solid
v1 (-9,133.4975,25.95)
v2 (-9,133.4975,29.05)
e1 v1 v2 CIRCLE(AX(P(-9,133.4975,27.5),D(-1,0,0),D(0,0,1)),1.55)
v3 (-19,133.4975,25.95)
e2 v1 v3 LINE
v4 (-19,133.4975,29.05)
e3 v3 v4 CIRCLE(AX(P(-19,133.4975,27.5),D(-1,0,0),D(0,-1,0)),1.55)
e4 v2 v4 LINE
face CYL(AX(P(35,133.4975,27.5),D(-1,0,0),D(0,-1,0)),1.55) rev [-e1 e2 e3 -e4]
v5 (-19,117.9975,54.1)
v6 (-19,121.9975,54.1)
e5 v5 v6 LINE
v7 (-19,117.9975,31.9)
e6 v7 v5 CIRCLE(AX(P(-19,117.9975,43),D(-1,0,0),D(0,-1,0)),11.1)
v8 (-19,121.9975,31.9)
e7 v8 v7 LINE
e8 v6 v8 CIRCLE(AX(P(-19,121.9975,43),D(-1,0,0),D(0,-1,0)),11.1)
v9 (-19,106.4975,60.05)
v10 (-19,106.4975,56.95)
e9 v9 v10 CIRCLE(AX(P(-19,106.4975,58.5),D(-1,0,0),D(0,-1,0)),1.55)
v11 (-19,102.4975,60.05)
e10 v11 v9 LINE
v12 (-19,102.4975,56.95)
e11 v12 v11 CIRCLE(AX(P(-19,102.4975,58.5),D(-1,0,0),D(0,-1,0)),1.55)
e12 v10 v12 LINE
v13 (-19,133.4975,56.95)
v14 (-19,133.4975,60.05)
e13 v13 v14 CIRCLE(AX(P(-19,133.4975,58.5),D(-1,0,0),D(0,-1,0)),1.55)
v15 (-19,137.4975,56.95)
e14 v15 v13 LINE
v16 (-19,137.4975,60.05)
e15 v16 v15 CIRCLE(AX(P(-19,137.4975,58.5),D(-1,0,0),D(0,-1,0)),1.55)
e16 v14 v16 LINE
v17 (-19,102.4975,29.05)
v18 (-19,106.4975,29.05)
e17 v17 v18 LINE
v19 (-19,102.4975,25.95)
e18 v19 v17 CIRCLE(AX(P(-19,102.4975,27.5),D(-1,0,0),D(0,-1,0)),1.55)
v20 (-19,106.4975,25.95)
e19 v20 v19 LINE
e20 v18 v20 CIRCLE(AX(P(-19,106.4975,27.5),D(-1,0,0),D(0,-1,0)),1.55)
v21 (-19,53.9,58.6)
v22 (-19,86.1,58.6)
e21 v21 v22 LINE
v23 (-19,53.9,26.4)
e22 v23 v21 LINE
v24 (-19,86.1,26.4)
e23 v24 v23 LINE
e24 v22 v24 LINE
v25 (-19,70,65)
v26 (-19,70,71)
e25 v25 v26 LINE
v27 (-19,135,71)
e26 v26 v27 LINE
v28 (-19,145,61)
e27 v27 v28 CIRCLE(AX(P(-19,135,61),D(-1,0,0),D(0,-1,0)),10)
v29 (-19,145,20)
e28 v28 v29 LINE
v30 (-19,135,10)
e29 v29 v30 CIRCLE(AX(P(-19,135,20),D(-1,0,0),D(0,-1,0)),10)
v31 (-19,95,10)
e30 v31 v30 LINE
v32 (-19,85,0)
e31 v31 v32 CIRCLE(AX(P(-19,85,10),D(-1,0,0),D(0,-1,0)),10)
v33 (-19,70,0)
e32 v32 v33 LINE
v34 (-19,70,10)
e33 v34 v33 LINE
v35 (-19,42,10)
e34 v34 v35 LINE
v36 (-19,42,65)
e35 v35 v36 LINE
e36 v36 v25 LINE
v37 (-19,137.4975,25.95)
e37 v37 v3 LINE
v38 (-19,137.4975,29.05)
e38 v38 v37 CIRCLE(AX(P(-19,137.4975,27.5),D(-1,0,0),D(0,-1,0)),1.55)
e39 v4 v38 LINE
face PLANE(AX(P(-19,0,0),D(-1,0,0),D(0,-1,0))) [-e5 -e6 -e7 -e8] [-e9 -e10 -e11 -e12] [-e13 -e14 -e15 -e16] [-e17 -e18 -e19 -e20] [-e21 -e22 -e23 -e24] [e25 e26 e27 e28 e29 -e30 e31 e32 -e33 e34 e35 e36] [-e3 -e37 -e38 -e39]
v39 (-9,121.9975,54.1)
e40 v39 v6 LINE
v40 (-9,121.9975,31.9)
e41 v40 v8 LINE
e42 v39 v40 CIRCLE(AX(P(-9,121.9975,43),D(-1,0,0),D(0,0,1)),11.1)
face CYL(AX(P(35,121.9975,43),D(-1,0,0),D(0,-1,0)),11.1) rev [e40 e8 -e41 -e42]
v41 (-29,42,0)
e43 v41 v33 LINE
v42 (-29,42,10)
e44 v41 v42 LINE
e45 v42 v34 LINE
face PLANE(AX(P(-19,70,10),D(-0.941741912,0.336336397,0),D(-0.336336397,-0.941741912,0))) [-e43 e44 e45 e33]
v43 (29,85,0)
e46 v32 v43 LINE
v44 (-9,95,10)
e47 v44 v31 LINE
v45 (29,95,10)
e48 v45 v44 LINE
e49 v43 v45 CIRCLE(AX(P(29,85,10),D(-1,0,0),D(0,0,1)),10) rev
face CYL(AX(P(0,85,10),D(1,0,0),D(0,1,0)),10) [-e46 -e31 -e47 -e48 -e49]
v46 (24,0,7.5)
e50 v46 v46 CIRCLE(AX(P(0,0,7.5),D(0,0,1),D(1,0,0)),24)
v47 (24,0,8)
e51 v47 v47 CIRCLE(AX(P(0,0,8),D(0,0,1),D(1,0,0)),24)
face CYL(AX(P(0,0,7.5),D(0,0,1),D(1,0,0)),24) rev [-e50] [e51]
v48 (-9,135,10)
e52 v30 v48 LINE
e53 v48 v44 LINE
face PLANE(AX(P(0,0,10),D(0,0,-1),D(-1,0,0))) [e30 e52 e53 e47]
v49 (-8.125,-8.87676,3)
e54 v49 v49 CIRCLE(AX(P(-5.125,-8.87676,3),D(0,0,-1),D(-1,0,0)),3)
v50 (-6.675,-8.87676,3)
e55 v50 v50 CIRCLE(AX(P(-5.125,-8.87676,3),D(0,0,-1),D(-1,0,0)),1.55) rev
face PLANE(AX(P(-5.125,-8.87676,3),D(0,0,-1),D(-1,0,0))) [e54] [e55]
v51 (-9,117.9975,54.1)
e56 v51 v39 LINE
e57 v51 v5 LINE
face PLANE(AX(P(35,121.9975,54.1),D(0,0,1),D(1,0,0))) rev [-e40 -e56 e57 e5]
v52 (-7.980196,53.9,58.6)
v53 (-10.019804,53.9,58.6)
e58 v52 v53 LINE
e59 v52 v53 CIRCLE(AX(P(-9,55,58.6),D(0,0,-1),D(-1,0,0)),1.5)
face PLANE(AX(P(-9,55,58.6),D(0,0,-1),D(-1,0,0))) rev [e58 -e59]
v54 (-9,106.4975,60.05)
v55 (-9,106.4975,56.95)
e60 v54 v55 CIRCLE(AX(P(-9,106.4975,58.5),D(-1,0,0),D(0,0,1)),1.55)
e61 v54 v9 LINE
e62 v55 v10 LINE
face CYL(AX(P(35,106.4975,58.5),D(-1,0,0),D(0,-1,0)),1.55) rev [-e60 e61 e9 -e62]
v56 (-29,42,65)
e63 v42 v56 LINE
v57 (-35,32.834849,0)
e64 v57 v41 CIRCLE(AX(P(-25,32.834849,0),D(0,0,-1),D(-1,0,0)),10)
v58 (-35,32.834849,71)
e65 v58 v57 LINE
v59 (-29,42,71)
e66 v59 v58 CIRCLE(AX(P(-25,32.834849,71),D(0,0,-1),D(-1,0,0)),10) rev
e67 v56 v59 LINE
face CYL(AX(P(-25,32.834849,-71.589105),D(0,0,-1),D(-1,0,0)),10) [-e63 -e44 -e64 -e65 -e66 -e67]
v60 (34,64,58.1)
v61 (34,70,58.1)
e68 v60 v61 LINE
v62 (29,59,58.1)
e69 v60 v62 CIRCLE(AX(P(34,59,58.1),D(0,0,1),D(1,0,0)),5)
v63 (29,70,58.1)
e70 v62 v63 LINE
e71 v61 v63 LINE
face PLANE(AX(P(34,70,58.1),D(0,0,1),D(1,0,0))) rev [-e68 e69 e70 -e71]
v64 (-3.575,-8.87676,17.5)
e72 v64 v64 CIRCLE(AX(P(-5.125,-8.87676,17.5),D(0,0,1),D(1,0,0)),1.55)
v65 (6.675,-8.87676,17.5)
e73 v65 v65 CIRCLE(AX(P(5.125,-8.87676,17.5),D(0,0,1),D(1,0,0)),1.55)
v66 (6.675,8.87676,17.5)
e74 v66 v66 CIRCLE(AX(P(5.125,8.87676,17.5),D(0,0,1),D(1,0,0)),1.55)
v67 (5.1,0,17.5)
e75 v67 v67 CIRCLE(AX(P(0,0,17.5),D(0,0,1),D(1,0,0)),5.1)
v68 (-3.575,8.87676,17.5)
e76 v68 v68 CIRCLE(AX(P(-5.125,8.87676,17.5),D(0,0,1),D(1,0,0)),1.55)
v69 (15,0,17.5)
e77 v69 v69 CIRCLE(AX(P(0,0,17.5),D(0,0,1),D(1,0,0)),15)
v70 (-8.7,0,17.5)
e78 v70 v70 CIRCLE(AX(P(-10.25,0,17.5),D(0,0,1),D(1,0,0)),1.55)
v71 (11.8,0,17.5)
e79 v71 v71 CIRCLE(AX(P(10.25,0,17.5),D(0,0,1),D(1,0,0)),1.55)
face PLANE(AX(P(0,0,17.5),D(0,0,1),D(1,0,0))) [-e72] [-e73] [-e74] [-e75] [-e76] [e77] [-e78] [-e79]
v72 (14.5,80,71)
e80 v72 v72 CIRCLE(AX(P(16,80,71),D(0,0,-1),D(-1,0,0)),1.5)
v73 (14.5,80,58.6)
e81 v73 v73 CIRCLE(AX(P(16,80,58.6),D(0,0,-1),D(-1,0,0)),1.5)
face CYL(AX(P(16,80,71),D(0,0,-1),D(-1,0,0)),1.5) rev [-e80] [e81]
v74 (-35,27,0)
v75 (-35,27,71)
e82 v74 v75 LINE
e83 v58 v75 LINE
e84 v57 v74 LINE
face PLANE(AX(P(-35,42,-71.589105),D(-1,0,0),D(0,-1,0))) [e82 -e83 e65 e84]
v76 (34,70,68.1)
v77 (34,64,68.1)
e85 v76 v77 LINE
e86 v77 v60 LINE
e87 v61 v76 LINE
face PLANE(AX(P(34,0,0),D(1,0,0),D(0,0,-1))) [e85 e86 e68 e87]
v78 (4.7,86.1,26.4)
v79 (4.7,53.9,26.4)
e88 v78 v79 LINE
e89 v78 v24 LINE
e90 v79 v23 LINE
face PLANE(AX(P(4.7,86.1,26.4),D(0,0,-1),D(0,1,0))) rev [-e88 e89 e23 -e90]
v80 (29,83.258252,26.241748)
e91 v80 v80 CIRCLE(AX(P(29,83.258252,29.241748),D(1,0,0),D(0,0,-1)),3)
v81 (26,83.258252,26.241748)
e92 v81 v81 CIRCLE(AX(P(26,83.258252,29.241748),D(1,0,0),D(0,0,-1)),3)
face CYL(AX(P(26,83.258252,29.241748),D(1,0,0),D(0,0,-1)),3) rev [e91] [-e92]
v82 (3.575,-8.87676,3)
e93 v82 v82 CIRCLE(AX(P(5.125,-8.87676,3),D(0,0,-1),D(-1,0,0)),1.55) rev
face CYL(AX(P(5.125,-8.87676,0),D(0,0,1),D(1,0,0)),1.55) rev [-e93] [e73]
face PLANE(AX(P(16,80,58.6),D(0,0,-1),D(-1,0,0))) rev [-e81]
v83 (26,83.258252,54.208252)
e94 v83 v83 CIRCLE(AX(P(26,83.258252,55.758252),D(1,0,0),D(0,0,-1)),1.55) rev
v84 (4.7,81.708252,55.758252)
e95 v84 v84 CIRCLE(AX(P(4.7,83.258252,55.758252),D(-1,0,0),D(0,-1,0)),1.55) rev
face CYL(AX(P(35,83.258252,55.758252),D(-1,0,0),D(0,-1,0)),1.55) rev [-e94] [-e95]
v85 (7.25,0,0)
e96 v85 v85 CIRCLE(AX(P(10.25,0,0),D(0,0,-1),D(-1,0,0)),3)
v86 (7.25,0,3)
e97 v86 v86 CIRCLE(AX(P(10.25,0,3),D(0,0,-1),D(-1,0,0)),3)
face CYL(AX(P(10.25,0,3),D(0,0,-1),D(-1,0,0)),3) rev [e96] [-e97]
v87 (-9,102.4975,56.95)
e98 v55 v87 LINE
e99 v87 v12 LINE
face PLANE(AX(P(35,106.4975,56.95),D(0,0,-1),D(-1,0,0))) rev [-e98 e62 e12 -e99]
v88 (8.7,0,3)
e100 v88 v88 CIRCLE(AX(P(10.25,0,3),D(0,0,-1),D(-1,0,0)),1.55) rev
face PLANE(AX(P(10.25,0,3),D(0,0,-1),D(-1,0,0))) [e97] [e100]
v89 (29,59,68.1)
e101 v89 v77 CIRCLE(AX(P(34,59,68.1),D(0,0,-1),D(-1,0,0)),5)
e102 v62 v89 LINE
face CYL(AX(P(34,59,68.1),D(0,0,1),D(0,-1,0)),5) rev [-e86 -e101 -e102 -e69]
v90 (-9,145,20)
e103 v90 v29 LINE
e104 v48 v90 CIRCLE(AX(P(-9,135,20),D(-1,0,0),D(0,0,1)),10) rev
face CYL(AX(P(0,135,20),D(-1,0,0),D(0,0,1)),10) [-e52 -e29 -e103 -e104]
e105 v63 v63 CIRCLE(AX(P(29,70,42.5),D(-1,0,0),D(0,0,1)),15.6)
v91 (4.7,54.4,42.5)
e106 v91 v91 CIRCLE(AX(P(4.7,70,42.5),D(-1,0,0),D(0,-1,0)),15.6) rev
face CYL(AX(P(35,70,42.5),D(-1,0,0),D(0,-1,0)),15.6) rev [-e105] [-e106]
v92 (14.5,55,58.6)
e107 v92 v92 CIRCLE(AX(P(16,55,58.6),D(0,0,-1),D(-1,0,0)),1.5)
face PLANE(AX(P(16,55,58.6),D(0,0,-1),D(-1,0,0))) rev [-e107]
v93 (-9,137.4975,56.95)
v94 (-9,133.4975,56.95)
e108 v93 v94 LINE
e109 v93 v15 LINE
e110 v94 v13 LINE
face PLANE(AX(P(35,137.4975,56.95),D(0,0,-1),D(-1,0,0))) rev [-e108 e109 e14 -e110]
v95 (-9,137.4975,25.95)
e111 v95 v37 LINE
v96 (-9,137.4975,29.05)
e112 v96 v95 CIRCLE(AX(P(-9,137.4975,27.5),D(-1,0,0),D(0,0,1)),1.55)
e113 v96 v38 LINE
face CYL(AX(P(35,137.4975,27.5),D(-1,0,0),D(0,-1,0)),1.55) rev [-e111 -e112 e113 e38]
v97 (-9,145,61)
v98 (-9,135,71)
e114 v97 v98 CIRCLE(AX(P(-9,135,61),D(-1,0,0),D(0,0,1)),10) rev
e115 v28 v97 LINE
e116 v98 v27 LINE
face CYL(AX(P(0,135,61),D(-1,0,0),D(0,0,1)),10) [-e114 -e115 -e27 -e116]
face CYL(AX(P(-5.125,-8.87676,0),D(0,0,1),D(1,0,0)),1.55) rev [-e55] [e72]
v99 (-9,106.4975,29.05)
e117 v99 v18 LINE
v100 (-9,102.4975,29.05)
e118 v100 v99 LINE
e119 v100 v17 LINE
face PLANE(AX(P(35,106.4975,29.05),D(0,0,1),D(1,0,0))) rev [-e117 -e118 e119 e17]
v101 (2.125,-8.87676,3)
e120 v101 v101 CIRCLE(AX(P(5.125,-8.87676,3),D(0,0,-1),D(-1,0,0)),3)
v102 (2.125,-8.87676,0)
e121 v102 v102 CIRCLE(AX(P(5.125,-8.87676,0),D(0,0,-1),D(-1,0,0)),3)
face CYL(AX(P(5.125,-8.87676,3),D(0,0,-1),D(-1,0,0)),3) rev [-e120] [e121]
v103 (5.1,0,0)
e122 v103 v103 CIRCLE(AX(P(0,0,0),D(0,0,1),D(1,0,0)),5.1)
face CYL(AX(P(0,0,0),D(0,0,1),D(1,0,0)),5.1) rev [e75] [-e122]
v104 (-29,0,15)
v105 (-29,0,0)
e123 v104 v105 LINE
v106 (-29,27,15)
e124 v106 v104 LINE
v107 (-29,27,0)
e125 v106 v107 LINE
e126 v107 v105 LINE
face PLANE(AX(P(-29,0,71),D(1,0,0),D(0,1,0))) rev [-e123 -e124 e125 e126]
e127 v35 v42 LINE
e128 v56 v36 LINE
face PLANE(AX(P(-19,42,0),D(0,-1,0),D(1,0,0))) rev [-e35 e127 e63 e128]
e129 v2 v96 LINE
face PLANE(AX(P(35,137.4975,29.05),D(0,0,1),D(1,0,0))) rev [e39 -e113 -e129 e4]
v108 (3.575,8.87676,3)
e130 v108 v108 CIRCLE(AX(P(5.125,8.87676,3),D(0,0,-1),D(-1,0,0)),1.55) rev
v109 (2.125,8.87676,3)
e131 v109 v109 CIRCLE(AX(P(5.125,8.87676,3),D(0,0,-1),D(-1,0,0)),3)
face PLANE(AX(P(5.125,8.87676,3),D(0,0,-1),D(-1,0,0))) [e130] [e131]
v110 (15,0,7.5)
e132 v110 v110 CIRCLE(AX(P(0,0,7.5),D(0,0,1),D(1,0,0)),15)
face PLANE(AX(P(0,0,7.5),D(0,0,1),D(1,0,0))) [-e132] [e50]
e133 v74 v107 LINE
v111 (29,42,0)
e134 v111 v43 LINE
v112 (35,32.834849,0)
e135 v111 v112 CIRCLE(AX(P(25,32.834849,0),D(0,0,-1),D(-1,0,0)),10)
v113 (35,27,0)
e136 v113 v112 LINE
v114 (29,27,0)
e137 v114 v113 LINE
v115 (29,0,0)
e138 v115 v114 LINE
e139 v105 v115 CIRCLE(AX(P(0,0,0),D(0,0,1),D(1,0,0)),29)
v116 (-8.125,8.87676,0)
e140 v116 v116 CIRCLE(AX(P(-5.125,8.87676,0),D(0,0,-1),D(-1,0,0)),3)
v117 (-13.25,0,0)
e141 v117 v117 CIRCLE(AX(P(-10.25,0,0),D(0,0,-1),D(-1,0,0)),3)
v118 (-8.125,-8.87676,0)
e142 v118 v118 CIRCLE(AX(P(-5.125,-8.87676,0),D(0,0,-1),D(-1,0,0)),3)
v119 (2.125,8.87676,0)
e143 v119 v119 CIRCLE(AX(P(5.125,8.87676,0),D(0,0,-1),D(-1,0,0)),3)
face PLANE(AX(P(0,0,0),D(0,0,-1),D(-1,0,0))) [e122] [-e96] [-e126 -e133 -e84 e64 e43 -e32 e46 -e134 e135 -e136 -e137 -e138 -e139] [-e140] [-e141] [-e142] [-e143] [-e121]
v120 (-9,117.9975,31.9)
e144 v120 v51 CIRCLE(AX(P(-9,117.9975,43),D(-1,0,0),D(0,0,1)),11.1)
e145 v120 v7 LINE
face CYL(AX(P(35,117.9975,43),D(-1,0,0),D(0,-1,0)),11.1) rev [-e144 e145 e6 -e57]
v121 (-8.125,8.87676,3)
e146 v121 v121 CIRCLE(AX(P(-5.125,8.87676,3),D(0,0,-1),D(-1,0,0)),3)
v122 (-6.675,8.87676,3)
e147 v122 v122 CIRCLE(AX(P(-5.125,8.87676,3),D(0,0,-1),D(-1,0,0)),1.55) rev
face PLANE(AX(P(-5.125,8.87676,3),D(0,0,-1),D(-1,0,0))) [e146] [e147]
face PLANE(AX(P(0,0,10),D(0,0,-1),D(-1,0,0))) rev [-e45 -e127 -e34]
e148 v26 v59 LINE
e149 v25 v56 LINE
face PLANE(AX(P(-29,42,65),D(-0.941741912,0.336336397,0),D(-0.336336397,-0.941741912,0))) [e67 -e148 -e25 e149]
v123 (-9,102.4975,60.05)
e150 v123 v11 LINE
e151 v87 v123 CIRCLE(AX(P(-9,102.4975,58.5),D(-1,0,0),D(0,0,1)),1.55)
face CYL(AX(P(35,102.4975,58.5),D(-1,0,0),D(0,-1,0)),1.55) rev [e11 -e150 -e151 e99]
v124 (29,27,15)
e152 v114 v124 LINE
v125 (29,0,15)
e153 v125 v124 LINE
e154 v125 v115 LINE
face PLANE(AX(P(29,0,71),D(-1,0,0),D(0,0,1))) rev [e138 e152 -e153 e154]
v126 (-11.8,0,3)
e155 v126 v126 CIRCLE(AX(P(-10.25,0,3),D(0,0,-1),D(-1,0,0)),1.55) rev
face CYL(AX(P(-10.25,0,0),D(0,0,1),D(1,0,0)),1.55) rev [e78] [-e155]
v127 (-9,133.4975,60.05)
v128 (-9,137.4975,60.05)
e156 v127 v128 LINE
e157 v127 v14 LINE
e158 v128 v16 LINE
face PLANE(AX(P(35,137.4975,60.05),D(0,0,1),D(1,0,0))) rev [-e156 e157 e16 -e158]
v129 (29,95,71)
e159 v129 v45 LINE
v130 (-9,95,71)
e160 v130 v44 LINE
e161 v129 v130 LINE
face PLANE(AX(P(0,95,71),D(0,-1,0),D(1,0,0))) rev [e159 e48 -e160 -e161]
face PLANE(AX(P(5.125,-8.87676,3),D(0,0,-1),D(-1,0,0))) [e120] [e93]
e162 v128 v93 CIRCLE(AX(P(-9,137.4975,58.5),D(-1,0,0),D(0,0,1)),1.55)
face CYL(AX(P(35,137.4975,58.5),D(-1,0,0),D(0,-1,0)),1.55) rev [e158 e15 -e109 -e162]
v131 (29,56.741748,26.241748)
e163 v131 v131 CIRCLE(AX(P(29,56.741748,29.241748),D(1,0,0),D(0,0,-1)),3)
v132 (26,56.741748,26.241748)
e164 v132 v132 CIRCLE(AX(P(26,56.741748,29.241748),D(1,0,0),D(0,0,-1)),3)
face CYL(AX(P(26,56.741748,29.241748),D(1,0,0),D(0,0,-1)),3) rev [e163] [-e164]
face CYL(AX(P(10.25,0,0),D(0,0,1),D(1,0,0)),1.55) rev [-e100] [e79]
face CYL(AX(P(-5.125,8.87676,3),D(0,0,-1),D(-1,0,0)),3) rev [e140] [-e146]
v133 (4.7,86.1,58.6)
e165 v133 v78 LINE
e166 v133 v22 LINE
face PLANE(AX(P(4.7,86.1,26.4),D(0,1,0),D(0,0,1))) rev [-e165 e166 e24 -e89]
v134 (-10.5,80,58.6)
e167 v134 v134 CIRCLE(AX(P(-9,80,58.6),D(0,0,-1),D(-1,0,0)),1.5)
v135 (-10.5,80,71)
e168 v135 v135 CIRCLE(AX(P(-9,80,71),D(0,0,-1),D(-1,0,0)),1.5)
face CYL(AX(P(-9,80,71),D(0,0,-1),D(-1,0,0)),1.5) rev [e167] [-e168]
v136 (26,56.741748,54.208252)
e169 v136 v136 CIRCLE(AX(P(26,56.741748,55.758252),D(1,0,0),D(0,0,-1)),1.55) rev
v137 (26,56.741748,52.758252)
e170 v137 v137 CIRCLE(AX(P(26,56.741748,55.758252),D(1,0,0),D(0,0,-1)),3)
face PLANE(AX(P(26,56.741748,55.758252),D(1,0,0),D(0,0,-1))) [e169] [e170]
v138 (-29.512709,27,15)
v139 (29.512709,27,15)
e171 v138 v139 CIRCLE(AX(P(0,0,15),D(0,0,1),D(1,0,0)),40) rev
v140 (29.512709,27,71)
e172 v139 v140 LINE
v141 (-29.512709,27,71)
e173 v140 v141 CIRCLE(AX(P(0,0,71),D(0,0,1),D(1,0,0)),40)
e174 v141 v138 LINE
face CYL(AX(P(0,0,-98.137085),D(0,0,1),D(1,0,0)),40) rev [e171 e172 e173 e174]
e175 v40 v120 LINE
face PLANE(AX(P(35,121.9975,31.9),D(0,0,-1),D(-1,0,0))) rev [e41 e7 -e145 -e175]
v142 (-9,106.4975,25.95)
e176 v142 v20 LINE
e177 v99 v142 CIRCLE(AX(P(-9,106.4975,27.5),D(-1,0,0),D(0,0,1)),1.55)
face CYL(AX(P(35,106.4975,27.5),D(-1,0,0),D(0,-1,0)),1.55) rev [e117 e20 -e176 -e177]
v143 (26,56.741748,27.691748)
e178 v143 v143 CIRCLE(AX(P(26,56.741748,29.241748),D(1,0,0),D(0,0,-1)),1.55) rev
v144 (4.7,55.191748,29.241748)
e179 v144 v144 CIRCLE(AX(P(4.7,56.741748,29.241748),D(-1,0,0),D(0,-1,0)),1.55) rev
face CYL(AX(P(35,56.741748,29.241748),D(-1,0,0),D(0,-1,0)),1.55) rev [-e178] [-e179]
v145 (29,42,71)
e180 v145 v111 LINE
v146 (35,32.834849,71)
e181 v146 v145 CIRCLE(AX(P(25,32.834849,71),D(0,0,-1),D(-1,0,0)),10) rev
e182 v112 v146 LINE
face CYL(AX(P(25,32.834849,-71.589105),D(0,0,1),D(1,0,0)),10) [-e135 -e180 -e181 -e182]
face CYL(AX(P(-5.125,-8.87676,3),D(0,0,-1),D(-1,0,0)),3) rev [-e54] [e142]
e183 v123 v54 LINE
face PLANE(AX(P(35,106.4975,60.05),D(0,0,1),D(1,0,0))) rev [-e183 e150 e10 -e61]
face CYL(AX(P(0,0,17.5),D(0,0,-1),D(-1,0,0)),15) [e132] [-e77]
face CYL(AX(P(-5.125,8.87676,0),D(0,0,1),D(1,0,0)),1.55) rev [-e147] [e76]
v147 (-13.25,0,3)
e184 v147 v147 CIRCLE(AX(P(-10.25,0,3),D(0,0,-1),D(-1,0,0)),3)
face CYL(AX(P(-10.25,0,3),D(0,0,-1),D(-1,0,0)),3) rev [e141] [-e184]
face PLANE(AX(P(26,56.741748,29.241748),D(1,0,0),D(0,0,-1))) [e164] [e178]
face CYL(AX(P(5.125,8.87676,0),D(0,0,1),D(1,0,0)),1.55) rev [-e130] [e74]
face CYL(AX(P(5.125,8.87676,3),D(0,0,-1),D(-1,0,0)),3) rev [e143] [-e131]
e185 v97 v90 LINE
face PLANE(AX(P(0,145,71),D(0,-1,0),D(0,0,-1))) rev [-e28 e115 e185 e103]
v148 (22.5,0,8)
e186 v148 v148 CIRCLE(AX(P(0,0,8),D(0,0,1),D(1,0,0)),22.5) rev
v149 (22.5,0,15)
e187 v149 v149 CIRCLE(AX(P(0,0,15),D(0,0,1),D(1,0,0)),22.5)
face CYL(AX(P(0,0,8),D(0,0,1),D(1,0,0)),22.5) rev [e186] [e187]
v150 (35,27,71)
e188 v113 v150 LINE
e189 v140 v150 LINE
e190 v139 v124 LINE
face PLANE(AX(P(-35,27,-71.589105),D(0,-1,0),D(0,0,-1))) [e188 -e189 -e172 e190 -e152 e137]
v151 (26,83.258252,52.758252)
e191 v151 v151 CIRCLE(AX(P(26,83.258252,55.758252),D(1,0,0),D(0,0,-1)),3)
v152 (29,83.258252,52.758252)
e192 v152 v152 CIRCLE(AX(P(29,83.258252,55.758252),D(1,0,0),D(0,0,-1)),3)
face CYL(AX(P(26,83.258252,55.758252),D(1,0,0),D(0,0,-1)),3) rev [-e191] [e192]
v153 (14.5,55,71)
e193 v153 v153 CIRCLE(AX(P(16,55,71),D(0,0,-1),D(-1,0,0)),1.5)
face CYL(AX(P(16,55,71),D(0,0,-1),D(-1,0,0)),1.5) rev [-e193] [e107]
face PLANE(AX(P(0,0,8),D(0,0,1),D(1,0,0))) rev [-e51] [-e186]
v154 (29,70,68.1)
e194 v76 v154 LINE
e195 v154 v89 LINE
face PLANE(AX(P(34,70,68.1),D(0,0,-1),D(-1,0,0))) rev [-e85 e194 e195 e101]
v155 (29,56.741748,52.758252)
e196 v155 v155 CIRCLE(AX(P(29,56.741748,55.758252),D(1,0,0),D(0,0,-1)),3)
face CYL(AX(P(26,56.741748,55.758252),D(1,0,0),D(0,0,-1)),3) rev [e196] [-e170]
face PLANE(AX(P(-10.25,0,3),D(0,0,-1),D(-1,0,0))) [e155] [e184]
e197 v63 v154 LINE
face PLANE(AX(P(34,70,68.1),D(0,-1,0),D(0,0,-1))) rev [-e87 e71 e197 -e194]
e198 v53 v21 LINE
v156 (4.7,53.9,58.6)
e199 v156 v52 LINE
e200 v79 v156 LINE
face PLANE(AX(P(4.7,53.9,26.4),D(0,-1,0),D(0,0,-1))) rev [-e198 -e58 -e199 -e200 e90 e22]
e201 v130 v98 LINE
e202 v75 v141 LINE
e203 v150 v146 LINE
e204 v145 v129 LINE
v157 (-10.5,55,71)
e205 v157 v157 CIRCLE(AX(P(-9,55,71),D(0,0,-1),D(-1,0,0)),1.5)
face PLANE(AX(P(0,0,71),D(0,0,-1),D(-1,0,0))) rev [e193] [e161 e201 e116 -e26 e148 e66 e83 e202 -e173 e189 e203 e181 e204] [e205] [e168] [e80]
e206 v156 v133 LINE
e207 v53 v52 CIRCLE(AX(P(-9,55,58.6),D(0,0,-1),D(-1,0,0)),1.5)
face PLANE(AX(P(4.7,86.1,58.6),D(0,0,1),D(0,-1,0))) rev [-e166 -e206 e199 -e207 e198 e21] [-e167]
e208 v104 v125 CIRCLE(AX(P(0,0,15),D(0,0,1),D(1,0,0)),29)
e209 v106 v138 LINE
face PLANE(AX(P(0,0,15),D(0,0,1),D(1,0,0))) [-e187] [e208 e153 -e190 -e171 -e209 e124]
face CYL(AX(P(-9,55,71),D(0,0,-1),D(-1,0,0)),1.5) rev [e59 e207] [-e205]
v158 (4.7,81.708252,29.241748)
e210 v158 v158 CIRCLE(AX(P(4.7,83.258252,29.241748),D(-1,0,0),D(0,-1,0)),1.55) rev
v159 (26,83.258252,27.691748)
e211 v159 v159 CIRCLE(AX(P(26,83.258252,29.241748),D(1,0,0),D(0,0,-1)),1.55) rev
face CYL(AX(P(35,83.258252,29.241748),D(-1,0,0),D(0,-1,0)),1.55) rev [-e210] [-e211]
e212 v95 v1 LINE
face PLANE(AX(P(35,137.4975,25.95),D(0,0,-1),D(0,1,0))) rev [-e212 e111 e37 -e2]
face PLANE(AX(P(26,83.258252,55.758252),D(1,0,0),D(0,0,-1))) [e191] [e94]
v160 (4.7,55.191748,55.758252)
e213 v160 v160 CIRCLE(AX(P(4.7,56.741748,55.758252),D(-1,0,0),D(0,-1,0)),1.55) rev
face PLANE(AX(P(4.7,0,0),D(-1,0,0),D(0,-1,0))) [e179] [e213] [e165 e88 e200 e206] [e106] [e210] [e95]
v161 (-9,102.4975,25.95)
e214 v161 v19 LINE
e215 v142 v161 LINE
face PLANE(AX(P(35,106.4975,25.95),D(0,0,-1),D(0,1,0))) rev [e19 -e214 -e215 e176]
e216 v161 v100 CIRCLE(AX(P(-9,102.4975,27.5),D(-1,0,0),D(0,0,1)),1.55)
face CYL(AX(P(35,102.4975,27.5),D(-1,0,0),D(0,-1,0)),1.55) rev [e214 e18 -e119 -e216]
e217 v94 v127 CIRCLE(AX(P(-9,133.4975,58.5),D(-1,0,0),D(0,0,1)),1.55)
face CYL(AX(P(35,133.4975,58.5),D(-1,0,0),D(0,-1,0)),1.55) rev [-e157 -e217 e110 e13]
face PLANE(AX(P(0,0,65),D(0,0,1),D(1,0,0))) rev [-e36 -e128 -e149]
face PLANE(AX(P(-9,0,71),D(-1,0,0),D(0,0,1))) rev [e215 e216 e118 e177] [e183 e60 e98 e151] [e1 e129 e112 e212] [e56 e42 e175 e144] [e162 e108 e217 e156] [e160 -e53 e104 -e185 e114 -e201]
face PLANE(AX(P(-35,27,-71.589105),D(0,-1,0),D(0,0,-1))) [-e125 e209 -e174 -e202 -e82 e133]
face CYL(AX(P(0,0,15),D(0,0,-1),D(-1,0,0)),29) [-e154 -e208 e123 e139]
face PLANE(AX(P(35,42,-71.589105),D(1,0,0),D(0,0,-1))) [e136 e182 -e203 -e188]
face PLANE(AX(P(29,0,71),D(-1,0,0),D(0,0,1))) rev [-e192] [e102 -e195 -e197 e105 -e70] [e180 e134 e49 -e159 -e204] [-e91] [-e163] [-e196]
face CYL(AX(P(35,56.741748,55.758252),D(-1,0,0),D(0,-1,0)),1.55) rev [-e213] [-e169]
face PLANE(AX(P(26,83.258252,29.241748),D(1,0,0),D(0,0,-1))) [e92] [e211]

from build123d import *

# Parameters (mm, degrees)
SKETCH_1_R           = 29
EXTRUDE_1_DEPTH      = 15
SKETCH_2_R           = 1.55
SKETCH_2_R_2         = 5.1
CUT_EXTRUDE_1_DEPTH  = 44.669211122
EXTRUDE_2_DEPTH      = 71
SKETCH_12_W          = 70
SKETCH_12_H          = 15
EXTRUDE_3_DEPTH      = 71
FILLET_5_R           = 10
SKETCH_22_W          = 71
SKETCH_22_H          = 103
CUT_EXTRUDE_11_DEPTH = 10
SKETCH_4_R           = 40
CUT_EXTRUDE_2_DEPTH  = 56
SKETCH_5_R           = 15.6
SKETCH_5_R_2         = 1.55
CUT_EXTRUDE_3_DEPTH  = 171.241005636
SKETCH_6_W           = 32.2
SKETCH_6_H           = 32.2
CUT_EXTRUDE_4_DEPTH  = 23.7
CUT_EXTRUDE_5_DEPTH  = 171.241005636
SKETCH_8_W           = 10
SKETCH_8_H           = 50
CUT_EXTRUDE_6_DEPTH  = 10
FILLET_1_R           = 10
FILLET_2_R           = 10
FILLET_3_R           = 10
SKETCH_17_R          = 22.5
CUT_EXTRUDE_7_DEPTH  = 7
SKETCH_18_R          = 24
CUT_EXTRUDE_8_DEPTH  = 0.5
EXTRUDE_START        = 10
SKETCH_19_R          = 15
SKETCH_19_R_2        = 1.55
SKETCH_19_R_3        = 5.1
EXTRUDE_5_DEPTH      = 10
SKETCH_20_R          = 3
CUT_EXTRUDE_9_DEPTH  = 3
SKETCH_23_R          = 1.5
CUT_EXTRUDE_12_DEPTH = 161.262160225
SKETCH_27_R          = 3
CUT_EXTRUDE_14_DEPTH = 3
SKETCH_28_W          = 10
SKETCH_28_H          = 6
EXTRUDE_6_DEPTH      = 5
FILLET_6_R           = 5
EXTRUDE_7_DEPTH      = 10
EXTRUDE_8_DEPTH      = 6


# Some blends are built 0.0001 mm under size
with BuildPart() as part:
    # 草图1 → 凸台-拉伸1 (new body)
    with BuildSketch(Plane.XY):
        Circle(SKETCH_1_R)
    extrude(amount=EXTRUDE_1_DEPTH)

    # 草图2 → 切除-拉伸1 (cut, through all)
    with BuildSketch(Plane.XY.offset(15)):
        with Locations((-5.125, 8.876760389)):
            Circle(SKETCH_2_R)
        with Locations((5.125, 8.876760389)):
            Circle(SKETCH_2_R)
        with Locations((10.25, 0)):
            Circle(SKETCH_2_R)
        with Locations((5.125, -8.876760389)):
            Circle(SKETCH_2_R)
        Circle(SKETCH_2_R_2)
        with Locations((-5.125, -8.876760389)):
            Circle(SKETCH_2_R)
        with Locations((-10.25, 0)):
            Circle(SKETCH_2_R)
    extrude(amount=-CUT_EXTRUDE_1_DEPTH, mode=Mode.SUBTRACT)

    # 草图17 → 切除-拉伸7 (cut)
    with BuildSketch(Plane.XY.offset(15)):
        Circle(SKETCH_17_R)
    extrude(amount=-CUT_EXTRUDE_7_DEPTH, mode=Mode.SUBTRACT)

    # 草图18 → 切除-拉伸8 (cut)
    with BuildSketch(Plane.XY.offset(8)):
        Circle(SKETCH_18_R)
    extrude(amount=-CUT_EXTRUDE_8_DEPTH, mode=Mode.SUBTRACT)


with BuildPart() as body_2:
    # 草图3 → 凸台-拉伸2 (new body)
    with BuildSketch(Plane.XY):
        with BuildLine():
            ThreePointArc((-29, 0), (0, 29), (29, 0))
            Line((29, 0), (29, 95))
            Line((29, 95), (-9, 95))
            Line((-9, 95), (-9, 145))
            Line((-9, 145), (-29, 145))
            Line((-29, 145), (-29, 0))
        make_face()
    extrude(amount=EXTRUDE_2_DEPTH)

    # 草图12 → 凸台-拉伸3 (add)
    with BuildSketch(Plane.XY.offset(71)):
        with Locations((0, 34.5)):
            Rectangle(SKETCH_12_W, SKETCH_12_H)
    extrude(amount=-EXTRUDE_3_DEPTH)

    # 圆角5
    # the kernel refuses this fillet: 10 mm, written as the material it takes off along each edge
    with BuildSketch(Plane(origin=(35, 42, 93.912878475), x_dir=(0, -1, 0), z_dir=(0, 0, -1))) as fillet_5_piece_1:
        with BuildLine():
            CenterArc((9.16515139, 10), FILLET_5_R, 203.578178478, 66.421821522)
            Line((0, 6), (-0.183303028, 5.92))
            ThreePointArc((-0.183303028, 5.92), (-0.2, 3), (-0.2, 0))
            Line((-0.2, 0), (0, -0.2))
            Line((0, -0.2), (9.16515139, -0.2))
            Line((9.16515139, -0.2), (9.16515139, 0))
        make_face()
    extrude(amount=116.82575695, mode=Mode.SUBTRACT)
    with BuildSketch(Plane(origin=(-35, 42, 93.912878475), x_dir=(0, -1, 0), z_dir=(0, 0, -1))) as fillet_5_piece_2:
        with BuildLine():
            CenterArc((9.16515139, -10), FILLET_5_R, 90, 66.421821522)
            Line((0, -6), (-0.183303028, -5.92))
            ThreePointArc((-0.183303028, -5.92), (-0.2, -3), (-0.2, 0))
            Line((-0.2, 0), (0, 0.2))
            Line((0, 0.2), (9.16515139, 0.2))
            Line((9.16515139, 0.2), (9.16515139, 0))
        make_face()
    extrude(amount=116.82575695, mode=Mode.SUBTRACT)

    # 草图22 → 切除-拉伸11 (cut)
    with BuildSketch(Plane.ZY.offset(29)):
        with Locations((35.5, 93.5)):
            Rectangle(SKETCH_22_W, SKETCH_22_H)
    extrude(amount=-CUT_EXTRUDE_11_DEPTH, mode=Mode.SUBTRACT)

    # 草图4 → 切除-拉伸2 (cut)
    with BuildSketch(Plane.XY.offset(71)):
        Circle(SKETCH_4_R)
    extrude(amount=-CUT_EXTRUDE_2_DEPTH, mode=Mode.SUBTRACT)

    # 草图5 → 切除-拉伸3 (cut, through all)
    with BuildSketch(Plane.ZY.offset(19)):
        with Locations(Location((42.5, 70, 0), (0, 0, 270))):
            Circle(SKETCH_5_R)
        with Locations(Location((29.241747853, 83.258252147, 0), (0, 0, 270))):
            Circle(SKETCH_5_R_2)
        with Locations(Location((55.758252147, 83.258252147, 0), (0, 0, 270))):
            Circle(SKETCH_5_R_2)
        with Locations(Location((55.758252147, 56.741747853, 0), (0, 0, 270))):
            Circle(SKETCH_5_R_2)
        with Locations(Location((29.241747853, 56.741747853, 0), (0, 0, 270))):
            Circle(SKETCH_5_R_2)
    extrude(amount=-CUT_EXTRUDE_3_DEPTH, mode=Mode.SUBTRACT)

    # 草图6 → 切除-拉伸4 (cut)
    with BuildSketch(Plane.ZY.offset(19)):
        with Locations((42.5, 70)):
            Rectangle(SKETCH_6_W, SKETCH_6_H)
    extrude(amount=-CUT_EXTRUDE_4_DEPTH, mode=Mode.SUBTRACT)

    # 草图7 → 切除-拉伸5 (cut, through all)
    with BuildSketch(Plane.ZY.offset(19)):
        with BuildLine():
            Line((56.95, 137.497499937), (56.95, 133.497499937))
            ThreePointArc((56.95, 133.497499937), (58.5, 131.947499937), (60.05, 133.497499937))
            Line((60.05, 133.497499937), (60.05, 137.497499937))
            ThreePointArc((60.05, 137.497499937), (58.5, 139.047499937), (56.95, 137.497499937))
        make_face()
        with BuildLine():
            Line((54.1, 121.997499937), (54.1, 117.997499937))
            ThreePointArc((54.1, 117.997499937), (43, 106.897499937), (31.9, 117.997499937))
            Line((31.9, 117.997499937), (31.9, 121.997499937))
            ThreePointArc((31.9, 121.997499937), (43, 133.097499937), (54.1, 121.997499937))
        make_face()
        with BuildLine():
            Line((29.05, 137.497499937), (29.05, 133.497499937))
            ThreePointArc((29.05, 133.497499937), (27.5, 131.947499937), (25.95, 133.497499937))
            Line((25.95, 133.497499937), (25.95, 137.497499937))
            ThreePointArc((25.95, 137.497499937), (27.5, 139.047499937), (29.05, 137.497499937))
        make_face()
        with BuildLine():
            Line((56.95, 106.497499937), (56.95, 102.497499937))
            ThreePointArc((56.95, 102.497499937), (58.5, 100.947499937), (60.05, 102.497499937))
            Line((60.05, 102.497499937), (60.05, 106.497499937))
            ThreePointArc((60.05, 106.497499937), (58.5, 108.047499937), (56.95, 106.497499937))
        make_face()
        with BuildLine():
            Line((25.95, 106.497499937), (25.95, 102.497499937))
            ThreePointArc((25.95, 102.497499937), (27.5, 100.947499937), (29.05, 102.497499937))
            Line((29.05, 102.497499937), (29.05, 106.497499937))
            ThreePointArc((29.05, 106.497499937), (27.5, 108.047499937), (25.95, 106.497499937))
        make_face()
    extrude(amount=-CUT_EXTRUDE_5_DEPTH, mode=Mode.SUBTRACT)

    # 草图8 → 切除-拉伸6 (cut)
    with BuildSketch(Plane(origin=(0, 0, 0), x_dir=(-1, 0, 0), z_dir=(0, 0, -1))):
        with Locations((14, 120)):
            Rectangle(SKETCH_8_W, SKETCH_8_H)
    extrude(amount=-CUT_EXTRUDE_6_DEPTH, mode=Mode.SUBTRACT)

    # 圆角1
    fillet_1_edges = [body_2.edges().sort_by_distance(p)[0] for p in [
        (5, 95, 0),
    ]]
    fillet(fillet_1_edges, radius=FILLET_1_R)

    # 圆角2
    fillet_2_edges = [body_2.edges().sort_by_distance(p)[0] for p in [
        (-14, 145, 10),
    ]]
    fillet(fillet_2_edges, radius=FILLET_2_R)

    # 圆角3
    fillet_3_edges = [body_2.edges().sort_by_distance(p)[0] for p in [
        (-14, 145, 71),
    ]]
    fillet(fillet_3_edges, radius=FILLET_3_R)


    add(part.part)  # 凸台-拉伸5 merges part
    # 草图19 → 凸台-拉伸5 (add)
    with BuildSketch(Plane.XY.offset(7.5).offset(EXTRUDE_START)):
        Circle(SKETCH_19_R)
        with Locations((-5.125, -8.876760389)):
            Circle(SKETCH_19_R_2, mode=Mode.SUBTRACT)
        with Locations((5.125, -8.876760389)):
            Circle(SKETCH_19_R_2, mode=Mode.SUBTRACT)
        with Locations((10.25, 0)):
            Circle(SKETCH_19_R_2, mode=Mode.SUBTRACT)
        Circle(SKETCH_19_R_3, mode=Mode.SUBTRACT)
        with Locations((5.125, 8.876760389)):
            Circle(SKETCH_19_R_2, mode=Mode.SUBTRACT)
        with Locations((-5.125, 8.876760389)):
            Circle(SKETCH_19_R_2, mode=Mode.SUBTRACT)
        with Locations((-10.25, 0)):
            Circle(SKETCH_19_R_2, mode=Mode.SUBTRACT)
    extrude(amount=-EXTRUDE_5_DEPTH)

    # 草图20 → 切除-拉伸9 (cut)
    with BuildSketch(Plane(origin=(0, 0, 0), x_dir=(-1, 0, 0), z_dir=(0, 0, -1))):
        with Locations((-5.125, 8.876760389)):
            Circle(SKETCH_20_R)
        with Locations((5.125, 8.876760389)):
            Circle(SKETCH_20_R)
        with Locations((-10.25, 0)):
            Circle(SKETCH_20_R)
        with Locations((-5.125, -8.876760389)):
            Circle(SKETCH_20_R)
        with Locations((5.125, -8.876760389)):
            Circle(SKETCH_20_R)
        with Locations((10.25, 0)):
            Circle(SKETCH_20_R)
    extrude(amount=-CUT_EXTRUDE_9_DEPTH, mode=Mode.SUBTRACT)

    # 草图23 → 切除-拉伸12 (cut, through all)
    with BuildSketch(Plane(origin=(0, 0, 58.6), x_dir=(-1, 0, 0), z_dir=(0, 0, -1))):
        with Locations((-16, 80)):
            Circle(SKETCH_23_R)
        with Locations((9, 80)):
            Circle(SKETCH_23_R)
        with Locations((9, 55)):
            Circle(SKETCH_23_R)
        with Locations((-16, 55)):
            Circle(SKETCH_23_R)
    extrude(amount=-CUT_EXTRUDE_12_DEPTH, mode=Mode.SUBTRACT)

    # 草图27 → 切除-拉伸14 (cut)
    with BuildSketch(Plane(origin=(29, 0, 0), x_dir=(0, 0, -1), z_dir=(1, 0, 0))):
        with Locations((-55.758252147, 83.258252147)):
            Circle(SKETCH_27_R)
        with Locations((-29.241747853, 83.258252147)):
            Circle(SKETCH_27_R)
        with Locations((-55.758252147, 56.741747853)):
            Circle(SKETCH_27_R)
        with Locations((-29.241747853, 56.741747853)):
            Circle(SKETCH_27_R)
    extrude(amount=-CUT_EXTRUDE_14_DEPTH, mode=Mode.SUBTRACT)

    # 草图28 → 凸台-拉伸6 (add)
    with BuildSketch(Plane(origin=(29, 0, 0), x_dir=(0, 0, -1), z_dir=(1, 0, 0))):
        with Locations((-63.1, 67)):
            Rectangle(SKETCH_28_W, SKETCH_28_H)
    extrude(amount=EXTRUDE_6_DEPTH)

    # 圆角6
    fillet_6_edges = [body_2.edges().sort_by_distance(p)[0] for p in [
        (29, 64, 63.1),
    ]]
    fillet(fillet_6_edges, radius=FILLET_6_R - 0.0001)  # a hair under: the kernel refuses the full size

    # 草图29 → 凸台-拉伸7 (add)
    with BuildSketch(Plane(origin=(0, 0, 0), x_dir=(-1, 0, 0), z_dir=(0, 0, -1))):
        Polygon((19, 70), (29, 42), (19, 42), align=None)
    extrude(amount=-EXTRUDE_7_DEPTH)

    # 草图30 → 凸台-拉伸8 (add)
    with BuildSketch(Plane.XY.offset(71)):
        Polygon((-29, 42), (-19, 70), (-19, 42), align=None)
    extrude(amount=-EXTRUDE_8_DEPTH)


solid = body_2.part
